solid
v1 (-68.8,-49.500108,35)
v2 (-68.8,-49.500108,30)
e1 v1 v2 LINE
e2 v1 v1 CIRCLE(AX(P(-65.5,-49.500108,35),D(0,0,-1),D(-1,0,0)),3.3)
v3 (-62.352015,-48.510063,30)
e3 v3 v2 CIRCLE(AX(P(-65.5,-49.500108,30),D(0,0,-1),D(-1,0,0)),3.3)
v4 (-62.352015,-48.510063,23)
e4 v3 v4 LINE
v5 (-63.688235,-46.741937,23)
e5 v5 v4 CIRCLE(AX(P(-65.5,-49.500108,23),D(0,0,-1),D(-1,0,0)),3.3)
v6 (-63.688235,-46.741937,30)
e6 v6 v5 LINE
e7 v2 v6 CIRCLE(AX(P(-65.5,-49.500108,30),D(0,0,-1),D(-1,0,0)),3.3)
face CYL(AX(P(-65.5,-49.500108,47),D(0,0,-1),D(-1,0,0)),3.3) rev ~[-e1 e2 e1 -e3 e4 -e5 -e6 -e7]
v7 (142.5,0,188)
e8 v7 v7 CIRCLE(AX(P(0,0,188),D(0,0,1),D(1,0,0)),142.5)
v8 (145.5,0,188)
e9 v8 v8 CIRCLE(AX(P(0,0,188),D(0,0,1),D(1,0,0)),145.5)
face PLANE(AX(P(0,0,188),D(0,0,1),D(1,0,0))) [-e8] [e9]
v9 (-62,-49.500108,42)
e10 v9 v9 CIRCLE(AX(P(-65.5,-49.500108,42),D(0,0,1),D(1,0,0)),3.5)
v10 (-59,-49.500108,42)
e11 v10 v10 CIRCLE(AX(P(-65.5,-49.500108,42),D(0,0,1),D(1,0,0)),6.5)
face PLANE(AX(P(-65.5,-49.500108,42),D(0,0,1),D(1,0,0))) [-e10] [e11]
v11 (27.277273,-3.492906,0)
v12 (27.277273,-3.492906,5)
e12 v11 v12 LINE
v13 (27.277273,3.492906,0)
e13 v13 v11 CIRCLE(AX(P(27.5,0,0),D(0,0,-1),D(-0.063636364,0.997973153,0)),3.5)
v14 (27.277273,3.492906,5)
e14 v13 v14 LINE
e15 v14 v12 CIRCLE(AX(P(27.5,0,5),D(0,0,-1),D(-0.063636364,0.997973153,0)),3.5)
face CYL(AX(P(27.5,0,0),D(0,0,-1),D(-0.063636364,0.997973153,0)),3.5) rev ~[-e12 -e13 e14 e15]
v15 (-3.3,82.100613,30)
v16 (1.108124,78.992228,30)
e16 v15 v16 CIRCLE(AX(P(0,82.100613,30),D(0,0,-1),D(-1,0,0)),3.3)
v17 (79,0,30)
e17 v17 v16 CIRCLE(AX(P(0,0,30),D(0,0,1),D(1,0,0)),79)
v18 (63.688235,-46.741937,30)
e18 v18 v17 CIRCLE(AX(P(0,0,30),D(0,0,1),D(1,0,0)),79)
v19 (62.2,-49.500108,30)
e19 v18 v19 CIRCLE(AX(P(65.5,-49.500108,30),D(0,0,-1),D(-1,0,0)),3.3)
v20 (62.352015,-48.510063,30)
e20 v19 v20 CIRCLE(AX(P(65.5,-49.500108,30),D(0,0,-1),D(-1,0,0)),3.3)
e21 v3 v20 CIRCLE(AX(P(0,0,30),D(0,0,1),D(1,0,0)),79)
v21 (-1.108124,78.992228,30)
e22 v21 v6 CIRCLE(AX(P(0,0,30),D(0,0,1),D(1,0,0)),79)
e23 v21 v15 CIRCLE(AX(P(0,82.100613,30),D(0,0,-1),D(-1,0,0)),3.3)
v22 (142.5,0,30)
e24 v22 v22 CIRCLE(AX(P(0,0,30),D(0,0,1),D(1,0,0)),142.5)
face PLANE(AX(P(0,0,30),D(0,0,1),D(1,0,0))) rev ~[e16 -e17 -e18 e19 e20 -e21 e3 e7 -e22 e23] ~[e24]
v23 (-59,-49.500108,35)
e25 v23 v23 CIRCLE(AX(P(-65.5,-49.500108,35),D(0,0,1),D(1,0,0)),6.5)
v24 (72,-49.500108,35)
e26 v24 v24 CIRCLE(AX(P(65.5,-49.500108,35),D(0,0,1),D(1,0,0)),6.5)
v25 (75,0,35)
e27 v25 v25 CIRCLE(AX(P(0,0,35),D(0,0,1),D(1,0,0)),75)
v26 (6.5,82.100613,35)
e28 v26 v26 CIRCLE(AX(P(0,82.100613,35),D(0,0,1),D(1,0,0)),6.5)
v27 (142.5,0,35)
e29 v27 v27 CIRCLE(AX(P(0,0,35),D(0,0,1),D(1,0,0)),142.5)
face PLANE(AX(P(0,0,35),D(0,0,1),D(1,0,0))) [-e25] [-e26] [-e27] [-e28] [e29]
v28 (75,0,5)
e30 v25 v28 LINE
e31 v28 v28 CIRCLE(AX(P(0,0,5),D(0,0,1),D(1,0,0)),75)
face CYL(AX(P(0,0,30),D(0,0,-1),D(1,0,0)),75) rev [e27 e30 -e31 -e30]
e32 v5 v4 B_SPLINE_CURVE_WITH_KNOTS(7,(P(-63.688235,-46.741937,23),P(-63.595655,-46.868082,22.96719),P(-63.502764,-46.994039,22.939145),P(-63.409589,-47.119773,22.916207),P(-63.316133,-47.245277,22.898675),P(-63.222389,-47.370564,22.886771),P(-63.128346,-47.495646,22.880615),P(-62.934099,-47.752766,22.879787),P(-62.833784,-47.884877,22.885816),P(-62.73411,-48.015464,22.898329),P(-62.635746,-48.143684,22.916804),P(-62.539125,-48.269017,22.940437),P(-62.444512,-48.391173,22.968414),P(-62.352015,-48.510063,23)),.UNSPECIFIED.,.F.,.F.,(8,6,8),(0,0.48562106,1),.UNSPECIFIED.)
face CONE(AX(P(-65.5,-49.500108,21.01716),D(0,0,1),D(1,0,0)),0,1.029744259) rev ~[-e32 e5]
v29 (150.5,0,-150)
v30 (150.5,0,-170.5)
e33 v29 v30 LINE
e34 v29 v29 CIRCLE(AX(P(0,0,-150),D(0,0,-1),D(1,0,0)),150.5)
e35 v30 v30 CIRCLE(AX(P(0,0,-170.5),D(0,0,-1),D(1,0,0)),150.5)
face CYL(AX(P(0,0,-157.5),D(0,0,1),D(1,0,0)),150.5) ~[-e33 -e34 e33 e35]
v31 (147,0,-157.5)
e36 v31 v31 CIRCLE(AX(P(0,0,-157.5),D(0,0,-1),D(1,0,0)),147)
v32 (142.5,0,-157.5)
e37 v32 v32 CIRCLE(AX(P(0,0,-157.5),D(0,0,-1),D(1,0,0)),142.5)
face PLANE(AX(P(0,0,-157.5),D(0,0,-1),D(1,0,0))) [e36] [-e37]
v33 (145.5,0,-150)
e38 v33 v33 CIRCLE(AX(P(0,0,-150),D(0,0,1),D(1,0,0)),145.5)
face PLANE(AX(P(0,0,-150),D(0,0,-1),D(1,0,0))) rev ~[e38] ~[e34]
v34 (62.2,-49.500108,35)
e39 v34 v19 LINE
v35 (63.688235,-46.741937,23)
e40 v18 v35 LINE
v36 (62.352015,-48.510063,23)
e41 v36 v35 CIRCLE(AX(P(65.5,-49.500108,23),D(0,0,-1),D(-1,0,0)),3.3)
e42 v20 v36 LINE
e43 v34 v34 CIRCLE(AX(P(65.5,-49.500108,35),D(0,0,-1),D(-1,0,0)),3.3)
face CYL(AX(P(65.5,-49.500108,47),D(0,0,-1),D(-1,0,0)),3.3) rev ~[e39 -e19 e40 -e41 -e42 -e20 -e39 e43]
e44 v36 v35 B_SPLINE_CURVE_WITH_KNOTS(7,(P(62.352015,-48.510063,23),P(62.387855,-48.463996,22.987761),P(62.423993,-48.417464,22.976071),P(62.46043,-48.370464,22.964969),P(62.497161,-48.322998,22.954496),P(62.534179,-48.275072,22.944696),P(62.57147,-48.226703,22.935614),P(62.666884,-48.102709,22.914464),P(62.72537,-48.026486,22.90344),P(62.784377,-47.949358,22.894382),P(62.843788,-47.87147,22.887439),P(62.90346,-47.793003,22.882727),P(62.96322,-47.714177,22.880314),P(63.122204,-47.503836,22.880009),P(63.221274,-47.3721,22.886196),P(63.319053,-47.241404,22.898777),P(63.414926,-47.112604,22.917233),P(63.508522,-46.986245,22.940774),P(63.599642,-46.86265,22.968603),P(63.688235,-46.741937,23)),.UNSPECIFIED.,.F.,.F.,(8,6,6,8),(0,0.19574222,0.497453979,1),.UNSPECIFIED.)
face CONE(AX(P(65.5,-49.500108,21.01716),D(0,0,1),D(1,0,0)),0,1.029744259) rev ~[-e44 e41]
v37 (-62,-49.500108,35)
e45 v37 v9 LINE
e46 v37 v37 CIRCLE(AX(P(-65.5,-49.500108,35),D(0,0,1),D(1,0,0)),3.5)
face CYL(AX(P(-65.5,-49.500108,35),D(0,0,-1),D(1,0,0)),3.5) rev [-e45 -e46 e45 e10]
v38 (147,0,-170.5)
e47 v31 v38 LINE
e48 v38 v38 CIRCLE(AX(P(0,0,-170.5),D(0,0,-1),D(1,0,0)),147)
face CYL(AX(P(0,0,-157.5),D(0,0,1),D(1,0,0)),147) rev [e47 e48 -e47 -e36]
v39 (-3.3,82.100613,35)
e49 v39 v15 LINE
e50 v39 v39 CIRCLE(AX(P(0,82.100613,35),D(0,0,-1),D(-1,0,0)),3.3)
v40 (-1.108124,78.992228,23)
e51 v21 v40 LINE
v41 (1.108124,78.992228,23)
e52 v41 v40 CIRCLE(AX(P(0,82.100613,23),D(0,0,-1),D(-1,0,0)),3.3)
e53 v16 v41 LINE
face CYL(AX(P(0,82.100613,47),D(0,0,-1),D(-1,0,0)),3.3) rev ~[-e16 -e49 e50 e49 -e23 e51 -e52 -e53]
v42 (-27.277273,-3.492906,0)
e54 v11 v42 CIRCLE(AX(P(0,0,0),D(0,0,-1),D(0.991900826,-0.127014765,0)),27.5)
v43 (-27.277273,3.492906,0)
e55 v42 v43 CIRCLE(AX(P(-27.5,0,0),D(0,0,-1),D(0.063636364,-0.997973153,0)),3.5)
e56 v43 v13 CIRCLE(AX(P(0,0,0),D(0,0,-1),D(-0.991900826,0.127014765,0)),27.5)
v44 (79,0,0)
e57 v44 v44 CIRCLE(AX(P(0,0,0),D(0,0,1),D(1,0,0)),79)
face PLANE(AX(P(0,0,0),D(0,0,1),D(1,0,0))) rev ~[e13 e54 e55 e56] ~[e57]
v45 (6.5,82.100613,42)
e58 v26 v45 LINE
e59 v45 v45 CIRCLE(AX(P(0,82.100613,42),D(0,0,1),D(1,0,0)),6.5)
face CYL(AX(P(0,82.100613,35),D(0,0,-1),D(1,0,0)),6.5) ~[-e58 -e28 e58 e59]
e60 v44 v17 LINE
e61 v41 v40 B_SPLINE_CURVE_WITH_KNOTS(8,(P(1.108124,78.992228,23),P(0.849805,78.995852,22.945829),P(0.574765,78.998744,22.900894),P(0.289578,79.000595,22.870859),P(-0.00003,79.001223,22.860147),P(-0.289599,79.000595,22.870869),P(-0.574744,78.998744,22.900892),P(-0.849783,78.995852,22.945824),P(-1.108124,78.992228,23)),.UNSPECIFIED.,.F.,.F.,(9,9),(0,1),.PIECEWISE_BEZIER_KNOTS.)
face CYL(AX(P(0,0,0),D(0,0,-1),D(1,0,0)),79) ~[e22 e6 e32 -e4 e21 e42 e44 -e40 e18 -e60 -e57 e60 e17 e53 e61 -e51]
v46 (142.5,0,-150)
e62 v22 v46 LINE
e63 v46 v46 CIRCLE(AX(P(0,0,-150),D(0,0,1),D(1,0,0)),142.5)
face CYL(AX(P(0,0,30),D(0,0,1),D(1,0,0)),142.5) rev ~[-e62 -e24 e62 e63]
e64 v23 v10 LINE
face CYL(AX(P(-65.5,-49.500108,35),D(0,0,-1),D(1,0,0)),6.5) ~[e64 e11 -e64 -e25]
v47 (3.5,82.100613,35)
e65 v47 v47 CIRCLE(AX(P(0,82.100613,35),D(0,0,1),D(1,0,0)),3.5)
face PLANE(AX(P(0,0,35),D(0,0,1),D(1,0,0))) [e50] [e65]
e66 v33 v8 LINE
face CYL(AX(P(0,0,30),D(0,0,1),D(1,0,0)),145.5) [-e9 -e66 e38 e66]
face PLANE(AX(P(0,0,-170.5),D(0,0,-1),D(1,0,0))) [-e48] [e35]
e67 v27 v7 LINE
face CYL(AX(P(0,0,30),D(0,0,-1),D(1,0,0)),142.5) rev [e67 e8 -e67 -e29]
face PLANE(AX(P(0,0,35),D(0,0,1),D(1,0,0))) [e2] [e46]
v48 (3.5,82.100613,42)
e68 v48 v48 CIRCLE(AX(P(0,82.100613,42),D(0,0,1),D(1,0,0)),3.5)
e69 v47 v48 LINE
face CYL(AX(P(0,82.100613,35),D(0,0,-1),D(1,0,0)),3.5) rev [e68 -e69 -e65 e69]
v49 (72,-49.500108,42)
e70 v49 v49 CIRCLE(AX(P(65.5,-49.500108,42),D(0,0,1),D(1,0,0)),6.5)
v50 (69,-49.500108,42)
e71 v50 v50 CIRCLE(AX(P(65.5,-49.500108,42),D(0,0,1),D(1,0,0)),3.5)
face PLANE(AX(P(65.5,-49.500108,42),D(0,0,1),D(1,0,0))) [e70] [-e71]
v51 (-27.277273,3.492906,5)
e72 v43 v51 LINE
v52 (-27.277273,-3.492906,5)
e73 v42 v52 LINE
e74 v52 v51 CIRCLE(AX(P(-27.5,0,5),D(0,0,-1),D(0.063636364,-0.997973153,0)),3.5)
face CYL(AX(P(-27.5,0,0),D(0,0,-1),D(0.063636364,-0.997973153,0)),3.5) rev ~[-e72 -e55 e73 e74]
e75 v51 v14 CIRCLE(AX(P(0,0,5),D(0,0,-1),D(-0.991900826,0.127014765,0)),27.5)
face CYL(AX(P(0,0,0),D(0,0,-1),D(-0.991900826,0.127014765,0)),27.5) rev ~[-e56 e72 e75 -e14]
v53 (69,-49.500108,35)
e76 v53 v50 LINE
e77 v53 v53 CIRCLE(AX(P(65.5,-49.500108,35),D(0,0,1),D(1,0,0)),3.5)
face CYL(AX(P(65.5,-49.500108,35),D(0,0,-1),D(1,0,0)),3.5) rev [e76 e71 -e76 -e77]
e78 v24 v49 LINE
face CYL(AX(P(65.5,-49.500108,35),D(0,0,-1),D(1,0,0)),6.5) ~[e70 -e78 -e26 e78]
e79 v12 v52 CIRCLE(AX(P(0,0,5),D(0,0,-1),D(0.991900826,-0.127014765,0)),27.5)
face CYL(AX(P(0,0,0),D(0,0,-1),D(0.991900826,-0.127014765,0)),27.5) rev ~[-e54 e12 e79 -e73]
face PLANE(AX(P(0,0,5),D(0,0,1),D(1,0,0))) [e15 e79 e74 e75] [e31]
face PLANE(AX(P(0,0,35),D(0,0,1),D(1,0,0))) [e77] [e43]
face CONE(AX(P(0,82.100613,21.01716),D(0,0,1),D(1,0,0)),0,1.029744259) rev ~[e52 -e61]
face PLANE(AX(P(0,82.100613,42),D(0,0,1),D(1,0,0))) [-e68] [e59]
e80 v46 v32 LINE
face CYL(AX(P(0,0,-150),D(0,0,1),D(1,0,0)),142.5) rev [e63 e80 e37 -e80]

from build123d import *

# Parameters (mm, degrees)
F0_R      = 75
F1_DEPTH  = 5
F0_R_2    = 79
F2_DEPTH  = 30
F3_R      = 142.5
F3_R_2    = 79
F3_R_3    = 75
F4_DEPTH  = 5
F3_R_4    = 145.5
F5_DEPTH  = 158
F6_DEPTH  = 180
F7_R      = 150.5
F7_R_2    = 145.5
F7_R_3    = 142.5
F8_DEPTH  = 7.5
F9_R      = 150.5
F9_R_2    = 147
F10_DEPTH = 13
F11_R     = 6.5
F11_R_2   = 3.5
F12_DEPTH = 7
F13_D     = 6.6
F13_DEPTH = 12
F13_TIP   = 1.9828400428


with BuildPart() as f1:
    # F0 (on Top) → F1 (new body)
    with BuildSketch(Plane.XY):
        Circle(F0_R)
        with BuildLine():
            ThreePointArc((-27.2772727273, 3.4929060339), (0, 27.5), (27.2772727273, 3.4929060339))
            ThreePointArc((27.2772727273, 3.4929060339), (31, 0), (27.2772727273, -3.4929060339))
            ThreePointArc((27.2772727273, -3.4929060339), (0, -27.5), (-27.2772727273, -3.4929060339))
            ThreePointArc((-27.2772727273, -3.4929060339), (-31, 0), (-27.2772727273, 3.4929060339))
        make_face(mode=Mode.SUBTRACT)
    extrude(amount=F1_DEPTH)

    # F0 (on Top) → F2 (join)
    with BuildSketch(Plane.XY):
        Circle(F0_R_2)
        Circle(F0_R, mode=Mode.SUBTRACT)
    extrude(amount=F2_DEPTH)

    # F3 (on face) → F4 (join)
    with BuildSketch(Plane.XY.offset(30)):
        Circle(F3_R)
        Circle(F3_R_2, mode=Mode.SUBTRACT)
        Circle(F3_R_2)
        Circle(F3_R_3, mode=Mode.SUBTRACT)
    extrude(amount=F4_DEPTH)

    # F3 (on face) → F5 (join)
    with BuildSketch(Plane.XY.offset(30)):
        Circle(F3_R_4)
        Circle(F3_R, mode=Mode.SUBTRACT)
    extrude(amount=F5_DEPTH)

    # F3 (on face) → F6 (join)
    with BuildSketch(Plane.XY.offset(30)):
        Circle(F3_R_4)
        Circle(F3_R, mode=Mode.SUBTRACT)
    extrude(amount=-F6_DEPTH)

    # F7 (on face) → F8 (join)
    with BuildSketch(Plane(origin=(0, 0, -150), x_dir=(1, 0, 0), z_dir=(0, 0, -1))):
        Circle(F7_R)
        Circle(F7_R_2, mode=Mode.SUBTRACT)
        Circle(F7_R_2)
        Circle(F7_R_3, mode=Mode.SUBTRACT)
    extrude(amount=F8_DEPTH)

    # F9 (on face) → F10 (join)
    with BuildSketch(Plane(origin=(0, 0, -157.5), x_dir=(1, 0, 0), z_dir=(0, 0, -1))):
        Circle(F9_R)
        Circle(F9_R_2, mode=Mode.SUBTRACT)
    extrude(amount=F10_DEPTH)

    # F11 (on face) → F12 (join)
    with BuildSketch(Plane.XY.offset(35)):
        with Locations((0, 82.1006134727)):
            Circle(F11_R)
        with Locations((0, 82.1006134727)):
            Circle(F11_R_2, mode=Mode.SUBTRACT)
        with Locations((65.5, -49.5001084099)):
            Circle(F11_R)
        with Locations((65.5, -49.5001084099)):
            Circle(F11_R_2, mode=Mode.SUBTRACT)
        with Locations((-65.5, -49.5001084099)):
            Circle(F11_R)
        with Locations((-65.5, -49.5001084099)):
            Circle(F11_R_2, mode=Mode.SUBTRACT)
    extrude(amount=F12_DEPTH)

    # F13
    with Locations(Plane.XY.offset(35)):
        with Locations((0, 82.1006134727), (65.5, -49.5001084099), (-65.5, -49.5001084099)):
            Hole(F13_D / 2, depth=F13_DEPTH)
            with Locations((0, 0, -(F13_DEPTH + F13_TIP / 2))):  # 118° drill point
                Cone(0, F13_D / 2, F13_TIP, mode=Mode.SUBTRACT)


solid = f1.part
